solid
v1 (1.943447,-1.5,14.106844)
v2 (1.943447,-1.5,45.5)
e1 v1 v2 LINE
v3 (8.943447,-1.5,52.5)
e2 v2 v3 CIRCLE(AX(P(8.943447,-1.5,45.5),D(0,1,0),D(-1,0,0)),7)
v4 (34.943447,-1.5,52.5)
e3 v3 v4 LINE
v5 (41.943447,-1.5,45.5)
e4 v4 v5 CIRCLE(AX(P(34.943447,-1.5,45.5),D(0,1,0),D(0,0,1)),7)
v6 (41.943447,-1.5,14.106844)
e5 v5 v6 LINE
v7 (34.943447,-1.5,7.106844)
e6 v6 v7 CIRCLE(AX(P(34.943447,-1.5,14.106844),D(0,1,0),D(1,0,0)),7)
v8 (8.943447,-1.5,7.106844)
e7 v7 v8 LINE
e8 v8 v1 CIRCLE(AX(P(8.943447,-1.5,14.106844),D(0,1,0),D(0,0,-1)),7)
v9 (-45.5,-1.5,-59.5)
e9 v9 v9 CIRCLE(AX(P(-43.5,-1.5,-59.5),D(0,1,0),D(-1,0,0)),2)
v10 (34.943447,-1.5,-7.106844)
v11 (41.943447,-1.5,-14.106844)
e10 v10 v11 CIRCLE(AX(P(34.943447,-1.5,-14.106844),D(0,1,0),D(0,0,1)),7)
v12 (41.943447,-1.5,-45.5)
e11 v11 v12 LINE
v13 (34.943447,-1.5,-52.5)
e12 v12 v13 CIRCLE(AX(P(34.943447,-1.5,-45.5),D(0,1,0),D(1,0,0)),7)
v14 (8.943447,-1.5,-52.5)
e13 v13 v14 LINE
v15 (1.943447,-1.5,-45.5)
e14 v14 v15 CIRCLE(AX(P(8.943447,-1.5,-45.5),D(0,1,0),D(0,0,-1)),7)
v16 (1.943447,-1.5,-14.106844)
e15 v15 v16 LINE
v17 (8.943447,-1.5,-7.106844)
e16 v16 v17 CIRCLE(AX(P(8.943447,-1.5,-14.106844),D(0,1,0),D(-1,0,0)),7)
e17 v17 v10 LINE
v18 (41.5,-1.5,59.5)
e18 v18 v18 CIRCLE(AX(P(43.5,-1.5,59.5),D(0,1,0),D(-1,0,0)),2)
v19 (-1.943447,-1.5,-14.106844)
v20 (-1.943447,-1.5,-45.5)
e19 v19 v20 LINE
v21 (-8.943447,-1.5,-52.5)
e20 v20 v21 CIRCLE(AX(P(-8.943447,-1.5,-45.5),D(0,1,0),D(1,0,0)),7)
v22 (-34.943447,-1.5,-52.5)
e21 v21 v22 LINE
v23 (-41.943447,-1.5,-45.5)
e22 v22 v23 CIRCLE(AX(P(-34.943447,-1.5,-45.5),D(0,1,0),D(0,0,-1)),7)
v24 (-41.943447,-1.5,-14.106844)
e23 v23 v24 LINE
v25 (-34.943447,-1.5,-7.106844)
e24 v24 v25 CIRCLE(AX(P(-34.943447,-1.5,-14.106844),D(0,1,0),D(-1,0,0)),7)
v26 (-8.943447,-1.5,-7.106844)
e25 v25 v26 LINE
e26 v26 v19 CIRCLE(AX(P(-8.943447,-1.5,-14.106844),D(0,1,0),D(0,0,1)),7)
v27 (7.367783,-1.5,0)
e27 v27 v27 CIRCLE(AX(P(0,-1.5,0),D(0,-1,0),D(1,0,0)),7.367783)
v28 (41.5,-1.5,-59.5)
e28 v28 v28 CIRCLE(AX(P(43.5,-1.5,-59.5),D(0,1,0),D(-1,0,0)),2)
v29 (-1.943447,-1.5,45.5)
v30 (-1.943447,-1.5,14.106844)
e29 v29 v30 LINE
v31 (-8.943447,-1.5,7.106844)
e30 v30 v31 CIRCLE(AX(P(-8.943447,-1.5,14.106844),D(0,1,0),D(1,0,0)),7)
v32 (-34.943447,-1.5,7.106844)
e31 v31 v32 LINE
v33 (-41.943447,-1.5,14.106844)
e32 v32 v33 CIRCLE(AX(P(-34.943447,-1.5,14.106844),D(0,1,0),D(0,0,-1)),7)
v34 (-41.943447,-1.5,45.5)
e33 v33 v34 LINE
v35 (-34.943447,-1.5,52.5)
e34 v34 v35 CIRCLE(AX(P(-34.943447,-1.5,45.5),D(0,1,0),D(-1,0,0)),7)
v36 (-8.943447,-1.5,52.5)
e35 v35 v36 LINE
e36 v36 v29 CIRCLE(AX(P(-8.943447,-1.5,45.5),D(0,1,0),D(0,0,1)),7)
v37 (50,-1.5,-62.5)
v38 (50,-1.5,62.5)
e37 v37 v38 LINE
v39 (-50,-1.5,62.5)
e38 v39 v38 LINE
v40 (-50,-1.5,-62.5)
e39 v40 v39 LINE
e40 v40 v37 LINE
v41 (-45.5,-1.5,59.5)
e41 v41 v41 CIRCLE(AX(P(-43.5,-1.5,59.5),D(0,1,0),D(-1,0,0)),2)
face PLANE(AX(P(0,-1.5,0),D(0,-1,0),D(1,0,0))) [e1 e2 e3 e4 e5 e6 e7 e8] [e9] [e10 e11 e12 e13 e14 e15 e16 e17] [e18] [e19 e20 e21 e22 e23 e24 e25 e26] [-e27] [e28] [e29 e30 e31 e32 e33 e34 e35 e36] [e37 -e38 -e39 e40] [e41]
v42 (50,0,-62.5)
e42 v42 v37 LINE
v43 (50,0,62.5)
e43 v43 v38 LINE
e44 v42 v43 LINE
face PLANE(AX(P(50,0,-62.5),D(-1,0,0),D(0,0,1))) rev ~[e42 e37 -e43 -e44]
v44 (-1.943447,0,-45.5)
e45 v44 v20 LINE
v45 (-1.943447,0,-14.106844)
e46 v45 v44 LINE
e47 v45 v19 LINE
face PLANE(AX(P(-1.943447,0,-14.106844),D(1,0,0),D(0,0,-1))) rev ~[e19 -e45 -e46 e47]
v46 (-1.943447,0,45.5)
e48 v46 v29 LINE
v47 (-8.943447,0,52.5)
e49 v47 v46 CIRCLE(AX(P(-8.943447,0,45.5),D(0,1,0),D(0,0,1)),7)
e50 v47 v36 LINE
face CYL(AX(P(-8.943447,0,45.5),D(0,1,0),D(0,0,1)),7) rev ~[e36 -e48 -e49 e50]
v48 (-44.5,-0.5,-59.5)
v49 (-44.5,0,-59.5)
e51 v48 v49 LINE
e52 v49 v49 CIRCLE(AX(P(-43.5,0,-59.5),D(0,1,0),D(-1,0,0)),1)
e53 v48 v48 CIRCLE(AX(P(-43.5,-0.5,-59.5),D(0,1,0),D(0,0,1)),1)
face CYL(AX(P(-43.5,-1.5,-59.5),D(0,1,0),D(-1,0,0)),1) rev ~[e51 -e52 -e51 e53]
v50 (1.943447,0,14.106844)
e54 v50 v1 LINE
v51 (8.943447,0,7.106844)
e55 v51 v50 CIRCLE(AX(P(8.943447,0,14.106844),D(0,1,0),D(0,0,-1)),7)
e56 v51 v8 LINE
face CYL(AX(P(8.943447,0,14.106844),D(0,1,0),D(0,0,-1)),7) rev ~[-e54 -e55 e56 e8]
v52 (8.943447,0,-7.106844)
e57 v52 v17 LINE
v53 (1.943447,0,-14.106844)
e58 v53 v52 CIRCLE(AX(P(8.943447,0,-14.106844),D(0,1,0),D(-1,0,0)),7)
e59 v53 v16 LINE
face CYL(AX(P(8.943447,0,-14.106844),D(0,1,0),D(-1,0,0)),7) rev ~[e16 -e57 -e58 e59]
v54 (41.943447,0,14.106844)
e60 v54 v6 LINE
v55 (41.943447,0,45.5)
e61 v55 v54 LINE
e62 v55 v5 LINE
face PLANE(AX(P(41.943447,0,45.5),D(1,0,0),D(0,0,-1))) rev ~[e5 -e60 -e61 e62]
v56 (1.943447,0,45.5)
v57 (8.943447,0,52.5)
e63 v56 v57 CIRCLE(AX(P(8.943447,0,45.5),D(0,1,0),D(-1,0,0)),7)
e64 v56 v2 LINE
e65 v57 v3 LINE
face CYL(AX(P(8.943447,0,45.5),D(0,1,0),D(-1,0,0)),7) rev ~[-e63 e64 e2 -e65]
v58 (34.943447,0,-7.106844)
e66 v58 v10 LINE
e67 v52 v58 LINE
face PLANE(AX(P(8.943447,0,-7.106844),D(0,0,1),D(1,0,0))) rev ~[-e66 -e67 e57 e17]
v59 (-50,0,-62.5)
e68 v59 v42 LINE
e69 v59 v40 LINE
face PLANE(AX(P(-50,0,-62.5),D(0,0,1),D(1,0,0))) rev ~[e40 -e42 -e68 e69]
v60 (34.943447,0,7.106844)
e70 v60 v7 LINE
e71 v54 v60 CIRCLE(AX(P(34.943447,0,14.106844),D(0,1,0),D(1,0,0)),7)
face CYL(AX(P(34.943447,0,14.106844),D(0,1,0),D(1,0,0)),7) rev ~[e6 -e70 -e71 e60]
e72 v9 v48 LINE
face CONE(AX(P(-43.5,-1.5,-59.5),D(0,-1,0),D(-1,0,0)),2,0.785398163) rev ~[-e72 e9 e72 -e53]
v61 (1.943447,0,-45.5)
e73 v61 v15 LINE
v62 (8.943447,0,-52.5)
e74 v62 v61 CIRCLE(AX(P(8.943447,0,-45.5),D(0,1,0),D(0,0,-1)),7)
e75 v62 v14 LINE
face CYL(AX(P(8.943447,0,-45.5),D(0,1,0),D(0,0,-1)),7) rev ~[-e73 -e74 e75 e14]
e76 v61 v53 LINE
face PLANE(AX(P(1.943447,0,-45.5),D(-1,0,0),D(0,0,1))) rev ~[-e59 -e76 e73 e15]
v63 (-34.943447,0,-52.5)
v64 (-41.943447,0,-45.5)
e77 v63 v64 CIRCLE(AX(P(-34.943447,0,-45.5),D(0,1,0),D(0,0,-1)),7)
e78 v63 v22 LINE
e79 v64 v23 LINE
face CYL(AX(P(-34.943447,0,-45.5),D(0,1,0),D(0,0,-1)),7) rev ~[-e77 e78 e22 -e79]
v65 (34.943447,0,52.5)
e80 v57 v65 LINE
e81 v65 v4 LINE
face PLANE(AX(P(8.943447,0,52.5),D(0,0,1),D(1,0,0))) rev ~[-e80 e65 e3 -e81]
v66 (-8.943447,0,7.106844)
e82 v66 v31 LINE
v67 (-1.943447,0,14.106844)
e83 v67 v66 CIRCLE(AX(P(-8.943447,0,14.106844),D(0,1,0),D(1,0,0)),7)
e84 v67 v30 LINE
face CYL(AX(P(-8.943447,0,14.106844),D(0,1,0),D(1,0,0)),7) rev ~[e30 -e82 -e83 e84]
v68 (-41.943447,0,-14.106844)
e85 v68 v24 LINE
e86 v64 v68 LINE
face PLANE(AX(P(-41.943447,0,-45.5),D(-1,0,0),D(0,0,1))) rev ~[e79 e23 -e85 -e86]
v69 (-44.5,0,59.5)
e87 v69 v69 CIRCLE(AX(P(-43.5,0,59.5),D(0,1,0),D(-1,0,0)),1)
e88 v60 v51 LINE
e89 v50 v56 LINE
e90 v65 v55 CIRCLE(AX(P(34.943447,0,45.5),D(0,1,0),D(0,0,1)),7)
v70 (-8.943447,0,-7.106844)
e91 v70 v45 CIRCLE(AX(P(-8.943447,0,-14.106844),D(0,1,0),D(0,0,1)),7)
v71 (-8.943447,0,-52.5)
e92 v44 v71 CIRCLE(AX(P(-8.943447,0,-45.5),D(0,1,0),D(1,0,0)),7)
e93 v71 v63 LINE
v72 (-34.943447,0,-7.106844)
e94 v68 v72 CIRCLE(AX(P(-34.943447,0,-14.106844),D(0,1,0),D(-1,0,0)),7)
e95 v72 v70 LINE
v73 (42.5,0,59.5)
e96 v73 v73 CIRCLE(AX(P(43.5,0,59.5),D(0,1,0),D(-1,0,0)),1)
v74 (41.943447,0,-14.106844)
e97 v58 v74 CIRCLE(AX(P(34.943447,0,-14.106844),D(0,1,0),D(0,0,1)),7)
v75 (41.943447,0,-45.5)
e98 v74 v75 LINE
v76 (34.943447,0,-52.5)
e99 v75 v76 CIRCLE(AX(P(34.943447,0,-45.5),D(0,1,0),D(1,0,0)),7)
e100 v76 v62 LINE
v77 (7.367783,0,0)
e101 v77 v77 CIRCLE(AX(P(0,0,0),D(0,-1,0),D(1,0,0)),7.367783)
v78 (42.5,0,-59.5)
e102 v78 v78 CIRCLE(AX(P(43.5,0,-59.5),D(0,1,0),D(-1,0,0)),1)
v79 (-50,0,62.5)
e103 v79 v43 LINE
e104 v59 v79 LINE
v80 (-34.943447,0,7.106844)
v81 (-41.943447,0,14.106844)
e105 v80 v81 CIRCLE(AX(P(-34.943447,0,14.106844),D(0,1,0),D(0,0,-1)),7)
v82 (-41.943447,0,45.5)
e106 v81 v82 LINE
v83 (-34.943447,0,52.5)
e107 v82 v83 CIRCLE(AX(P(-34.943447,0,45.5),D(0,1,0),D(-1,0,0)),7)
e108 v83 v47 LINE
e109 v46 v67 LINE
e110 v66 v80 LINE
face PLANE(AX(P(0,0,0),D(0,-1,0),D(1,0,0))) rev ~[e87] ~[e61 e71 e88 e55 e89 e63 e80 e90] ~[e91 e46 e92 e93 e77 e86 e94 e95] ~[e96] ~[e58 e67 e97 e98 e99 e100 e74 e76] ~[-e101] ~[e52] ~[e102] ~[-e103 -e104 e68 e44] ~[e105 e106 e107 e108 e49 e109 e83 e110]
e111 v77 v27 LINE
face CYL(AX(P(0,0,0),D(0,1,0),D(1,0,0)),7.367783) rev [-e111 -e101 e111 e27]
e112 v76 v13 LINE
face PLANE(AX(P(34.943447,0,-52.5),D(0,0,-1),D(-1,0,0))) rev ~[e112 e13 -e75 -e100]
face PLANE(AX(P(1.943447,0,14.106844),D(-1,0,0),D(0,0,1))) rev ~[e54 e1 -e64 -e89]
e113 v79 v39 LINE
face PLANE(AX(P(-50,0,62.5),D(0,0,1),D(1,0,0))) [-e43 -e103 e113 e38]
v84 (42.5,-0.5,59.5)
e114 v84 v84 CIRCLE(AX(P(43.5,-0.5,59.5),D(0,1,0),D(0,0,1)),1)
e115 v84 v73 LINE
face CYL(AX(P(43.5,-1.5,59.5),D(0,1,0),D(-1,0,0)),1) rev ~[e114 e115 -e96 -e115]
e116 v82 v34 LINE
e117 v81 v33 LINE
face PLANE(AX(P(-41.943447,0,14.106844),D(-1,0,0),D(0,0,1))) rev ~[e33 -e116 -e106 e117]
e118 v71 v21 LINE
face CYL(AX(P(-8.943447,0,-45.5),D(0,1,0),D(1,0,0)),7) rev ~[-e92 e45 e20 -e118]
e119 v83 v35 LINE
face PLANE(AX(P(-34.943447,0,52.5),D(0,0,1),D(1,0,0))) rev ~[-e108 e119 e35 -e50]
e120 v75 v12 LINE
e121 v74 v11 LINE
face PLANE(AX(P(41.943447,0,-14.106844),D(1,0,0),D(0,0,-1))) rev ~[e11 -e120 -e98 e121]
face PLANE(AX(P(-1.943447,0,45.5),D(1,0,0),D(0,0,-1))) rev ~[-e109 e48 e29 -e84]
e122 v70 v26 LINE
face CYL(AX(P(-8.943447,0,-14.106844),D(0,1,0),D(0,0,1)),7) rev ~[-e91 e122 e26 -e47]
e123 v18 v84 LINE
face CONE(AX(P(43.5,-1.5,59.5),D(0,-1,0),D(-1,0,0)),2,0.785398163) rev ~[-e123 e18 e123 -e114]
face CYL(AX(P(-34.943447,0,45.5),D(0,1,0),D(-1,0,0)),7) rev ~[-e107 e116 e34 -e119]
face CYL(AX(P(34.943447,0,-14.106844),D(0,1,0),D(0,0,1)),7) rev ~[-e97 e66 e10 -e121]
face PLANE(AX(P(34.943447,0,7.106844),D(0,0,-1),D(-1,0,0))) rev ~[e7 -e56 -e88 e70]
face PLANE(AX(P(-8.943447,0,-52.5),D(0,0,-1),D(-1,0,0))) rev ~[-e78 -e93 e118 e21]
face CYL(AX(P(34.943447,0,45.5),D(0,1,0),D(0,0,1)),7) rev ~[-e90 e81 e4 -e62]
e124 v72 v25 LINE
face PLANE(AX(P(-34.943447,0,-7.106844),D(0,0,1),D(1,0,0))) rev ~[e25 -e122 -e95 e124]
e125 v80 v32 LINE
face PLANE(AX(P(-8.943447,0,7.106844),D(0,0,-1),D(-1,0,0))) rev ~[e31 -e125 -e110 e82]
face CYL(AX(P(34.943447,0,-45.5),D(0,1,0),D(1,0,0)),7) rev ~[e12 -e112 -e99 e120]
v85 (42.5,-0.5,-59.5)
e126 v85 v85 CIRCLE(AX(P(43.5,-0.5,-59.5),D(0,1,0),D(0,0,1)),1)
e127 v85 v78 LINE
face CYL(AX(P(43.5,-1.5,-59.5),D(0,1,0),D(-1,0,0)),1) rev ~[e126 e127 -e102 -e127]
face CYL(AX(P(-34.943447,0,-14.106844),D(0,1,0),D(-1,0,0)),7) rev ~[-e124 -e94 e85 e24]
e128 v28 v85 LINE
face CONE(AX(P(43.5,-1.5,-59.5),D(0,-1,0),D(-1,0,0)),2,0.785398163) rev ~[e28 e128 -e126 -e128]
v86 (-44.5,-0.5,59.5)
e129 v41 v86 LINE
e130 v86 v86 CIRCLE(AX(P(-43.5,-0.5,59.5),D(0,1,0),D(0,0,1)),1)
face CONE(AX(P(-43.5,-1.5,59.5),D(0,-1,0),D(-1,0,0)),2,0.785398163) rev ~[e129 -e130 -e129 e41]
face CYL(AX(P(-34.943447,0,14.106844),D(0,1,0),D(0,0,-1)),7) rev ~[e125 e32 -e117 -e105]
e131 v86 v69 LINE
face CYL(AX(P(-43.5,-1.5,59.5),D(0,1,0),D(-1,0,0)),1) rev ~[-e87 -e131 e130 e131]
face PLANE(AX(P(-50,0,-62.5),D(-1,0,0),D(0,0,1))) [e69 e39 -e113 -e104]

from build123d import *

# Parameters (mm, degrees)
F0_W           = 100
F0_H           = 125
F0_R           = 7.3677826157
F1_DEPTH       = 1.5
F3_D           = 2
F3_CSINK_D     = 4
F3_CSINK_ANGLE = 90


# Not quite as in the source:
# - a feature names something its author has since deleted; it is built from what else it names


with BuildPart() as f1:
    # F0 (on Front) → F1 (new body)
    with BuildSketch(Plane.XZ):
        Rectangle(F0_W, F0_H)
        with BuildLine():
            Line((-34.9434472264, -7.1068441343), (-8.9434472264, -7.1068441343))
            ThreePointArc((-8.9434472264, -7.1068441343), (-3.9936997581, -9.157096666), (-1.9434472264, -14.1068441343))
            Line((-1.9434472264, -14.1068441343), (-1.9434472264, -45.5))
            ThreePointArc((-1.9434472264, -45.5), (-3.9936997581, -50.4497474683), (-8.9434472264, -52.5))
            Line((-8.9434472264, -52.5), (-34.9434472264, -52.5))
            ThreePointArc((-34.9434472264, -52.5), (-39.8931946947, -50.4497474683), (-41.9434472264, -45.5))
            Line((-41.9434472264, -45.5), (-41.9434472264, -14.1068441343))
            ThreePointArc((-41.9434472264, -14.1068441343), (-39.8931946947, -9.157096666), (-34.9434472264, -7.1068441343))
        make_face(mode=Mode.SUBTRACT)
        with BuildLine():
            ThreePointArc((41.9434472264, -45.5), (39.8931946947, -50.4497474683), (34.9434472264, -52.5))
            Line((34.9434472264, -52.5), (8.9434472264, -52.5))
            ThreePointArc((8.9434472264, -52.5), (3.9936997581, -50.4497474683), (1.9434472264, -45.5))
            Line((1.9434472264, -45.5), (1.9434472264, -14.1068441343))
            ThreePointArc((1.9434472264, -14.1068441343), (3.9936997581, -9.157096666), (8.9434472264, -7.1068441343))
            Line((8.9434472264, -7.1068441343), (34.9434472264, -7.1068441343))
            ThreePointArc((34.9434472264, -7.1068441343), (39.8931946947, -9.157096666), (41.9434472264, -14.1068441343))
            Line((41.9434472264, -14.1068441343), (41.9434472264, -45.5))
        make_face(mode=Mode.SUBTRACT)
        with BuildLine():
            ThreePointArc((-1.9434472264, 14.1068441343), (-3.9936997581, 9.157096666), (-8.9434472264, 7.1068441343))
            Line((-8.9434472264, 7.1068441343), (-34.9434472264, 7.1068441343))
            ThreePointArc((-34.9434472264, 7.1068441343), (-39.8931946947, 9.157096666), (-41.9434472264, 14.1068441343))
            Line((-41.9434472264, 14.1068441343), (-41.9434472264, 45.5))
            ThreePointArc((-41.9434472264, 45.5), (-39.8931946947, 50.4497474683), (-34.9434472264, 52.5))
            Line((-34.9434472264, 52.5), (-8.9434472264, 52.5))
            ThreePointArc((-8.9434472264, 52.5), (-3.9936997581, 50.4497474683), (-1.9434472264, 45.5))
            Line((-1.9434472264, 45.5), (-1.9434472264, 14.1068441343))
        make_face(mode=Mode.SUBTRACT)
        Circle(F0_R, mode=Mode.SUBTRACT)
        with BuildLine():
            ThreePointArc((8.9434472264, 7.1068441343), (3.9936997581, 9.157096666), (1.9434472264, 14.1068441343))
            Line((1.9434472264, 14.1068441343), (1.9434472264, 45.5))
            ThreePointArc((1.9434472264, 45.5), (3.9936997581, 50.4497474683), (8.9434472264, 52.5))
            Line((8.9434472264, 52.5), (34.9434472264, 52.5))
            ThreePointArc((34.9434472264, 52.5), (39.8931946947, 50.4497474683), (41.9434472264, 45.5))
            Line((41.9434472264, 45.5), (41.9434472264, 14.1068441343))
            ThreePointArc((41.9434472264, 14.1068441343), (39.8931946947, 9.157096666), (34.9434472264, 7.1068441343))
            Line((34.9434472264, 7.1068441343), (8.9434472264, 7.1068441343))
        make_face(mode=Mode.SUBTRACT)
    extrude(amount=F1_DEPTH)

    # F3 (through all)
    with Locations(Plane.XZ.offset(1.5)):
        with Locations((-43.5, -59.5), (43.5, -59.5), (43.5, 59.5), (-43.5, 59.5)):
            CounterSinkHole(F3_D / 2, F3_CSINK_D / 2, counter_sink_angle=F3_CSINK_ANGLE)


solid = f1.part
